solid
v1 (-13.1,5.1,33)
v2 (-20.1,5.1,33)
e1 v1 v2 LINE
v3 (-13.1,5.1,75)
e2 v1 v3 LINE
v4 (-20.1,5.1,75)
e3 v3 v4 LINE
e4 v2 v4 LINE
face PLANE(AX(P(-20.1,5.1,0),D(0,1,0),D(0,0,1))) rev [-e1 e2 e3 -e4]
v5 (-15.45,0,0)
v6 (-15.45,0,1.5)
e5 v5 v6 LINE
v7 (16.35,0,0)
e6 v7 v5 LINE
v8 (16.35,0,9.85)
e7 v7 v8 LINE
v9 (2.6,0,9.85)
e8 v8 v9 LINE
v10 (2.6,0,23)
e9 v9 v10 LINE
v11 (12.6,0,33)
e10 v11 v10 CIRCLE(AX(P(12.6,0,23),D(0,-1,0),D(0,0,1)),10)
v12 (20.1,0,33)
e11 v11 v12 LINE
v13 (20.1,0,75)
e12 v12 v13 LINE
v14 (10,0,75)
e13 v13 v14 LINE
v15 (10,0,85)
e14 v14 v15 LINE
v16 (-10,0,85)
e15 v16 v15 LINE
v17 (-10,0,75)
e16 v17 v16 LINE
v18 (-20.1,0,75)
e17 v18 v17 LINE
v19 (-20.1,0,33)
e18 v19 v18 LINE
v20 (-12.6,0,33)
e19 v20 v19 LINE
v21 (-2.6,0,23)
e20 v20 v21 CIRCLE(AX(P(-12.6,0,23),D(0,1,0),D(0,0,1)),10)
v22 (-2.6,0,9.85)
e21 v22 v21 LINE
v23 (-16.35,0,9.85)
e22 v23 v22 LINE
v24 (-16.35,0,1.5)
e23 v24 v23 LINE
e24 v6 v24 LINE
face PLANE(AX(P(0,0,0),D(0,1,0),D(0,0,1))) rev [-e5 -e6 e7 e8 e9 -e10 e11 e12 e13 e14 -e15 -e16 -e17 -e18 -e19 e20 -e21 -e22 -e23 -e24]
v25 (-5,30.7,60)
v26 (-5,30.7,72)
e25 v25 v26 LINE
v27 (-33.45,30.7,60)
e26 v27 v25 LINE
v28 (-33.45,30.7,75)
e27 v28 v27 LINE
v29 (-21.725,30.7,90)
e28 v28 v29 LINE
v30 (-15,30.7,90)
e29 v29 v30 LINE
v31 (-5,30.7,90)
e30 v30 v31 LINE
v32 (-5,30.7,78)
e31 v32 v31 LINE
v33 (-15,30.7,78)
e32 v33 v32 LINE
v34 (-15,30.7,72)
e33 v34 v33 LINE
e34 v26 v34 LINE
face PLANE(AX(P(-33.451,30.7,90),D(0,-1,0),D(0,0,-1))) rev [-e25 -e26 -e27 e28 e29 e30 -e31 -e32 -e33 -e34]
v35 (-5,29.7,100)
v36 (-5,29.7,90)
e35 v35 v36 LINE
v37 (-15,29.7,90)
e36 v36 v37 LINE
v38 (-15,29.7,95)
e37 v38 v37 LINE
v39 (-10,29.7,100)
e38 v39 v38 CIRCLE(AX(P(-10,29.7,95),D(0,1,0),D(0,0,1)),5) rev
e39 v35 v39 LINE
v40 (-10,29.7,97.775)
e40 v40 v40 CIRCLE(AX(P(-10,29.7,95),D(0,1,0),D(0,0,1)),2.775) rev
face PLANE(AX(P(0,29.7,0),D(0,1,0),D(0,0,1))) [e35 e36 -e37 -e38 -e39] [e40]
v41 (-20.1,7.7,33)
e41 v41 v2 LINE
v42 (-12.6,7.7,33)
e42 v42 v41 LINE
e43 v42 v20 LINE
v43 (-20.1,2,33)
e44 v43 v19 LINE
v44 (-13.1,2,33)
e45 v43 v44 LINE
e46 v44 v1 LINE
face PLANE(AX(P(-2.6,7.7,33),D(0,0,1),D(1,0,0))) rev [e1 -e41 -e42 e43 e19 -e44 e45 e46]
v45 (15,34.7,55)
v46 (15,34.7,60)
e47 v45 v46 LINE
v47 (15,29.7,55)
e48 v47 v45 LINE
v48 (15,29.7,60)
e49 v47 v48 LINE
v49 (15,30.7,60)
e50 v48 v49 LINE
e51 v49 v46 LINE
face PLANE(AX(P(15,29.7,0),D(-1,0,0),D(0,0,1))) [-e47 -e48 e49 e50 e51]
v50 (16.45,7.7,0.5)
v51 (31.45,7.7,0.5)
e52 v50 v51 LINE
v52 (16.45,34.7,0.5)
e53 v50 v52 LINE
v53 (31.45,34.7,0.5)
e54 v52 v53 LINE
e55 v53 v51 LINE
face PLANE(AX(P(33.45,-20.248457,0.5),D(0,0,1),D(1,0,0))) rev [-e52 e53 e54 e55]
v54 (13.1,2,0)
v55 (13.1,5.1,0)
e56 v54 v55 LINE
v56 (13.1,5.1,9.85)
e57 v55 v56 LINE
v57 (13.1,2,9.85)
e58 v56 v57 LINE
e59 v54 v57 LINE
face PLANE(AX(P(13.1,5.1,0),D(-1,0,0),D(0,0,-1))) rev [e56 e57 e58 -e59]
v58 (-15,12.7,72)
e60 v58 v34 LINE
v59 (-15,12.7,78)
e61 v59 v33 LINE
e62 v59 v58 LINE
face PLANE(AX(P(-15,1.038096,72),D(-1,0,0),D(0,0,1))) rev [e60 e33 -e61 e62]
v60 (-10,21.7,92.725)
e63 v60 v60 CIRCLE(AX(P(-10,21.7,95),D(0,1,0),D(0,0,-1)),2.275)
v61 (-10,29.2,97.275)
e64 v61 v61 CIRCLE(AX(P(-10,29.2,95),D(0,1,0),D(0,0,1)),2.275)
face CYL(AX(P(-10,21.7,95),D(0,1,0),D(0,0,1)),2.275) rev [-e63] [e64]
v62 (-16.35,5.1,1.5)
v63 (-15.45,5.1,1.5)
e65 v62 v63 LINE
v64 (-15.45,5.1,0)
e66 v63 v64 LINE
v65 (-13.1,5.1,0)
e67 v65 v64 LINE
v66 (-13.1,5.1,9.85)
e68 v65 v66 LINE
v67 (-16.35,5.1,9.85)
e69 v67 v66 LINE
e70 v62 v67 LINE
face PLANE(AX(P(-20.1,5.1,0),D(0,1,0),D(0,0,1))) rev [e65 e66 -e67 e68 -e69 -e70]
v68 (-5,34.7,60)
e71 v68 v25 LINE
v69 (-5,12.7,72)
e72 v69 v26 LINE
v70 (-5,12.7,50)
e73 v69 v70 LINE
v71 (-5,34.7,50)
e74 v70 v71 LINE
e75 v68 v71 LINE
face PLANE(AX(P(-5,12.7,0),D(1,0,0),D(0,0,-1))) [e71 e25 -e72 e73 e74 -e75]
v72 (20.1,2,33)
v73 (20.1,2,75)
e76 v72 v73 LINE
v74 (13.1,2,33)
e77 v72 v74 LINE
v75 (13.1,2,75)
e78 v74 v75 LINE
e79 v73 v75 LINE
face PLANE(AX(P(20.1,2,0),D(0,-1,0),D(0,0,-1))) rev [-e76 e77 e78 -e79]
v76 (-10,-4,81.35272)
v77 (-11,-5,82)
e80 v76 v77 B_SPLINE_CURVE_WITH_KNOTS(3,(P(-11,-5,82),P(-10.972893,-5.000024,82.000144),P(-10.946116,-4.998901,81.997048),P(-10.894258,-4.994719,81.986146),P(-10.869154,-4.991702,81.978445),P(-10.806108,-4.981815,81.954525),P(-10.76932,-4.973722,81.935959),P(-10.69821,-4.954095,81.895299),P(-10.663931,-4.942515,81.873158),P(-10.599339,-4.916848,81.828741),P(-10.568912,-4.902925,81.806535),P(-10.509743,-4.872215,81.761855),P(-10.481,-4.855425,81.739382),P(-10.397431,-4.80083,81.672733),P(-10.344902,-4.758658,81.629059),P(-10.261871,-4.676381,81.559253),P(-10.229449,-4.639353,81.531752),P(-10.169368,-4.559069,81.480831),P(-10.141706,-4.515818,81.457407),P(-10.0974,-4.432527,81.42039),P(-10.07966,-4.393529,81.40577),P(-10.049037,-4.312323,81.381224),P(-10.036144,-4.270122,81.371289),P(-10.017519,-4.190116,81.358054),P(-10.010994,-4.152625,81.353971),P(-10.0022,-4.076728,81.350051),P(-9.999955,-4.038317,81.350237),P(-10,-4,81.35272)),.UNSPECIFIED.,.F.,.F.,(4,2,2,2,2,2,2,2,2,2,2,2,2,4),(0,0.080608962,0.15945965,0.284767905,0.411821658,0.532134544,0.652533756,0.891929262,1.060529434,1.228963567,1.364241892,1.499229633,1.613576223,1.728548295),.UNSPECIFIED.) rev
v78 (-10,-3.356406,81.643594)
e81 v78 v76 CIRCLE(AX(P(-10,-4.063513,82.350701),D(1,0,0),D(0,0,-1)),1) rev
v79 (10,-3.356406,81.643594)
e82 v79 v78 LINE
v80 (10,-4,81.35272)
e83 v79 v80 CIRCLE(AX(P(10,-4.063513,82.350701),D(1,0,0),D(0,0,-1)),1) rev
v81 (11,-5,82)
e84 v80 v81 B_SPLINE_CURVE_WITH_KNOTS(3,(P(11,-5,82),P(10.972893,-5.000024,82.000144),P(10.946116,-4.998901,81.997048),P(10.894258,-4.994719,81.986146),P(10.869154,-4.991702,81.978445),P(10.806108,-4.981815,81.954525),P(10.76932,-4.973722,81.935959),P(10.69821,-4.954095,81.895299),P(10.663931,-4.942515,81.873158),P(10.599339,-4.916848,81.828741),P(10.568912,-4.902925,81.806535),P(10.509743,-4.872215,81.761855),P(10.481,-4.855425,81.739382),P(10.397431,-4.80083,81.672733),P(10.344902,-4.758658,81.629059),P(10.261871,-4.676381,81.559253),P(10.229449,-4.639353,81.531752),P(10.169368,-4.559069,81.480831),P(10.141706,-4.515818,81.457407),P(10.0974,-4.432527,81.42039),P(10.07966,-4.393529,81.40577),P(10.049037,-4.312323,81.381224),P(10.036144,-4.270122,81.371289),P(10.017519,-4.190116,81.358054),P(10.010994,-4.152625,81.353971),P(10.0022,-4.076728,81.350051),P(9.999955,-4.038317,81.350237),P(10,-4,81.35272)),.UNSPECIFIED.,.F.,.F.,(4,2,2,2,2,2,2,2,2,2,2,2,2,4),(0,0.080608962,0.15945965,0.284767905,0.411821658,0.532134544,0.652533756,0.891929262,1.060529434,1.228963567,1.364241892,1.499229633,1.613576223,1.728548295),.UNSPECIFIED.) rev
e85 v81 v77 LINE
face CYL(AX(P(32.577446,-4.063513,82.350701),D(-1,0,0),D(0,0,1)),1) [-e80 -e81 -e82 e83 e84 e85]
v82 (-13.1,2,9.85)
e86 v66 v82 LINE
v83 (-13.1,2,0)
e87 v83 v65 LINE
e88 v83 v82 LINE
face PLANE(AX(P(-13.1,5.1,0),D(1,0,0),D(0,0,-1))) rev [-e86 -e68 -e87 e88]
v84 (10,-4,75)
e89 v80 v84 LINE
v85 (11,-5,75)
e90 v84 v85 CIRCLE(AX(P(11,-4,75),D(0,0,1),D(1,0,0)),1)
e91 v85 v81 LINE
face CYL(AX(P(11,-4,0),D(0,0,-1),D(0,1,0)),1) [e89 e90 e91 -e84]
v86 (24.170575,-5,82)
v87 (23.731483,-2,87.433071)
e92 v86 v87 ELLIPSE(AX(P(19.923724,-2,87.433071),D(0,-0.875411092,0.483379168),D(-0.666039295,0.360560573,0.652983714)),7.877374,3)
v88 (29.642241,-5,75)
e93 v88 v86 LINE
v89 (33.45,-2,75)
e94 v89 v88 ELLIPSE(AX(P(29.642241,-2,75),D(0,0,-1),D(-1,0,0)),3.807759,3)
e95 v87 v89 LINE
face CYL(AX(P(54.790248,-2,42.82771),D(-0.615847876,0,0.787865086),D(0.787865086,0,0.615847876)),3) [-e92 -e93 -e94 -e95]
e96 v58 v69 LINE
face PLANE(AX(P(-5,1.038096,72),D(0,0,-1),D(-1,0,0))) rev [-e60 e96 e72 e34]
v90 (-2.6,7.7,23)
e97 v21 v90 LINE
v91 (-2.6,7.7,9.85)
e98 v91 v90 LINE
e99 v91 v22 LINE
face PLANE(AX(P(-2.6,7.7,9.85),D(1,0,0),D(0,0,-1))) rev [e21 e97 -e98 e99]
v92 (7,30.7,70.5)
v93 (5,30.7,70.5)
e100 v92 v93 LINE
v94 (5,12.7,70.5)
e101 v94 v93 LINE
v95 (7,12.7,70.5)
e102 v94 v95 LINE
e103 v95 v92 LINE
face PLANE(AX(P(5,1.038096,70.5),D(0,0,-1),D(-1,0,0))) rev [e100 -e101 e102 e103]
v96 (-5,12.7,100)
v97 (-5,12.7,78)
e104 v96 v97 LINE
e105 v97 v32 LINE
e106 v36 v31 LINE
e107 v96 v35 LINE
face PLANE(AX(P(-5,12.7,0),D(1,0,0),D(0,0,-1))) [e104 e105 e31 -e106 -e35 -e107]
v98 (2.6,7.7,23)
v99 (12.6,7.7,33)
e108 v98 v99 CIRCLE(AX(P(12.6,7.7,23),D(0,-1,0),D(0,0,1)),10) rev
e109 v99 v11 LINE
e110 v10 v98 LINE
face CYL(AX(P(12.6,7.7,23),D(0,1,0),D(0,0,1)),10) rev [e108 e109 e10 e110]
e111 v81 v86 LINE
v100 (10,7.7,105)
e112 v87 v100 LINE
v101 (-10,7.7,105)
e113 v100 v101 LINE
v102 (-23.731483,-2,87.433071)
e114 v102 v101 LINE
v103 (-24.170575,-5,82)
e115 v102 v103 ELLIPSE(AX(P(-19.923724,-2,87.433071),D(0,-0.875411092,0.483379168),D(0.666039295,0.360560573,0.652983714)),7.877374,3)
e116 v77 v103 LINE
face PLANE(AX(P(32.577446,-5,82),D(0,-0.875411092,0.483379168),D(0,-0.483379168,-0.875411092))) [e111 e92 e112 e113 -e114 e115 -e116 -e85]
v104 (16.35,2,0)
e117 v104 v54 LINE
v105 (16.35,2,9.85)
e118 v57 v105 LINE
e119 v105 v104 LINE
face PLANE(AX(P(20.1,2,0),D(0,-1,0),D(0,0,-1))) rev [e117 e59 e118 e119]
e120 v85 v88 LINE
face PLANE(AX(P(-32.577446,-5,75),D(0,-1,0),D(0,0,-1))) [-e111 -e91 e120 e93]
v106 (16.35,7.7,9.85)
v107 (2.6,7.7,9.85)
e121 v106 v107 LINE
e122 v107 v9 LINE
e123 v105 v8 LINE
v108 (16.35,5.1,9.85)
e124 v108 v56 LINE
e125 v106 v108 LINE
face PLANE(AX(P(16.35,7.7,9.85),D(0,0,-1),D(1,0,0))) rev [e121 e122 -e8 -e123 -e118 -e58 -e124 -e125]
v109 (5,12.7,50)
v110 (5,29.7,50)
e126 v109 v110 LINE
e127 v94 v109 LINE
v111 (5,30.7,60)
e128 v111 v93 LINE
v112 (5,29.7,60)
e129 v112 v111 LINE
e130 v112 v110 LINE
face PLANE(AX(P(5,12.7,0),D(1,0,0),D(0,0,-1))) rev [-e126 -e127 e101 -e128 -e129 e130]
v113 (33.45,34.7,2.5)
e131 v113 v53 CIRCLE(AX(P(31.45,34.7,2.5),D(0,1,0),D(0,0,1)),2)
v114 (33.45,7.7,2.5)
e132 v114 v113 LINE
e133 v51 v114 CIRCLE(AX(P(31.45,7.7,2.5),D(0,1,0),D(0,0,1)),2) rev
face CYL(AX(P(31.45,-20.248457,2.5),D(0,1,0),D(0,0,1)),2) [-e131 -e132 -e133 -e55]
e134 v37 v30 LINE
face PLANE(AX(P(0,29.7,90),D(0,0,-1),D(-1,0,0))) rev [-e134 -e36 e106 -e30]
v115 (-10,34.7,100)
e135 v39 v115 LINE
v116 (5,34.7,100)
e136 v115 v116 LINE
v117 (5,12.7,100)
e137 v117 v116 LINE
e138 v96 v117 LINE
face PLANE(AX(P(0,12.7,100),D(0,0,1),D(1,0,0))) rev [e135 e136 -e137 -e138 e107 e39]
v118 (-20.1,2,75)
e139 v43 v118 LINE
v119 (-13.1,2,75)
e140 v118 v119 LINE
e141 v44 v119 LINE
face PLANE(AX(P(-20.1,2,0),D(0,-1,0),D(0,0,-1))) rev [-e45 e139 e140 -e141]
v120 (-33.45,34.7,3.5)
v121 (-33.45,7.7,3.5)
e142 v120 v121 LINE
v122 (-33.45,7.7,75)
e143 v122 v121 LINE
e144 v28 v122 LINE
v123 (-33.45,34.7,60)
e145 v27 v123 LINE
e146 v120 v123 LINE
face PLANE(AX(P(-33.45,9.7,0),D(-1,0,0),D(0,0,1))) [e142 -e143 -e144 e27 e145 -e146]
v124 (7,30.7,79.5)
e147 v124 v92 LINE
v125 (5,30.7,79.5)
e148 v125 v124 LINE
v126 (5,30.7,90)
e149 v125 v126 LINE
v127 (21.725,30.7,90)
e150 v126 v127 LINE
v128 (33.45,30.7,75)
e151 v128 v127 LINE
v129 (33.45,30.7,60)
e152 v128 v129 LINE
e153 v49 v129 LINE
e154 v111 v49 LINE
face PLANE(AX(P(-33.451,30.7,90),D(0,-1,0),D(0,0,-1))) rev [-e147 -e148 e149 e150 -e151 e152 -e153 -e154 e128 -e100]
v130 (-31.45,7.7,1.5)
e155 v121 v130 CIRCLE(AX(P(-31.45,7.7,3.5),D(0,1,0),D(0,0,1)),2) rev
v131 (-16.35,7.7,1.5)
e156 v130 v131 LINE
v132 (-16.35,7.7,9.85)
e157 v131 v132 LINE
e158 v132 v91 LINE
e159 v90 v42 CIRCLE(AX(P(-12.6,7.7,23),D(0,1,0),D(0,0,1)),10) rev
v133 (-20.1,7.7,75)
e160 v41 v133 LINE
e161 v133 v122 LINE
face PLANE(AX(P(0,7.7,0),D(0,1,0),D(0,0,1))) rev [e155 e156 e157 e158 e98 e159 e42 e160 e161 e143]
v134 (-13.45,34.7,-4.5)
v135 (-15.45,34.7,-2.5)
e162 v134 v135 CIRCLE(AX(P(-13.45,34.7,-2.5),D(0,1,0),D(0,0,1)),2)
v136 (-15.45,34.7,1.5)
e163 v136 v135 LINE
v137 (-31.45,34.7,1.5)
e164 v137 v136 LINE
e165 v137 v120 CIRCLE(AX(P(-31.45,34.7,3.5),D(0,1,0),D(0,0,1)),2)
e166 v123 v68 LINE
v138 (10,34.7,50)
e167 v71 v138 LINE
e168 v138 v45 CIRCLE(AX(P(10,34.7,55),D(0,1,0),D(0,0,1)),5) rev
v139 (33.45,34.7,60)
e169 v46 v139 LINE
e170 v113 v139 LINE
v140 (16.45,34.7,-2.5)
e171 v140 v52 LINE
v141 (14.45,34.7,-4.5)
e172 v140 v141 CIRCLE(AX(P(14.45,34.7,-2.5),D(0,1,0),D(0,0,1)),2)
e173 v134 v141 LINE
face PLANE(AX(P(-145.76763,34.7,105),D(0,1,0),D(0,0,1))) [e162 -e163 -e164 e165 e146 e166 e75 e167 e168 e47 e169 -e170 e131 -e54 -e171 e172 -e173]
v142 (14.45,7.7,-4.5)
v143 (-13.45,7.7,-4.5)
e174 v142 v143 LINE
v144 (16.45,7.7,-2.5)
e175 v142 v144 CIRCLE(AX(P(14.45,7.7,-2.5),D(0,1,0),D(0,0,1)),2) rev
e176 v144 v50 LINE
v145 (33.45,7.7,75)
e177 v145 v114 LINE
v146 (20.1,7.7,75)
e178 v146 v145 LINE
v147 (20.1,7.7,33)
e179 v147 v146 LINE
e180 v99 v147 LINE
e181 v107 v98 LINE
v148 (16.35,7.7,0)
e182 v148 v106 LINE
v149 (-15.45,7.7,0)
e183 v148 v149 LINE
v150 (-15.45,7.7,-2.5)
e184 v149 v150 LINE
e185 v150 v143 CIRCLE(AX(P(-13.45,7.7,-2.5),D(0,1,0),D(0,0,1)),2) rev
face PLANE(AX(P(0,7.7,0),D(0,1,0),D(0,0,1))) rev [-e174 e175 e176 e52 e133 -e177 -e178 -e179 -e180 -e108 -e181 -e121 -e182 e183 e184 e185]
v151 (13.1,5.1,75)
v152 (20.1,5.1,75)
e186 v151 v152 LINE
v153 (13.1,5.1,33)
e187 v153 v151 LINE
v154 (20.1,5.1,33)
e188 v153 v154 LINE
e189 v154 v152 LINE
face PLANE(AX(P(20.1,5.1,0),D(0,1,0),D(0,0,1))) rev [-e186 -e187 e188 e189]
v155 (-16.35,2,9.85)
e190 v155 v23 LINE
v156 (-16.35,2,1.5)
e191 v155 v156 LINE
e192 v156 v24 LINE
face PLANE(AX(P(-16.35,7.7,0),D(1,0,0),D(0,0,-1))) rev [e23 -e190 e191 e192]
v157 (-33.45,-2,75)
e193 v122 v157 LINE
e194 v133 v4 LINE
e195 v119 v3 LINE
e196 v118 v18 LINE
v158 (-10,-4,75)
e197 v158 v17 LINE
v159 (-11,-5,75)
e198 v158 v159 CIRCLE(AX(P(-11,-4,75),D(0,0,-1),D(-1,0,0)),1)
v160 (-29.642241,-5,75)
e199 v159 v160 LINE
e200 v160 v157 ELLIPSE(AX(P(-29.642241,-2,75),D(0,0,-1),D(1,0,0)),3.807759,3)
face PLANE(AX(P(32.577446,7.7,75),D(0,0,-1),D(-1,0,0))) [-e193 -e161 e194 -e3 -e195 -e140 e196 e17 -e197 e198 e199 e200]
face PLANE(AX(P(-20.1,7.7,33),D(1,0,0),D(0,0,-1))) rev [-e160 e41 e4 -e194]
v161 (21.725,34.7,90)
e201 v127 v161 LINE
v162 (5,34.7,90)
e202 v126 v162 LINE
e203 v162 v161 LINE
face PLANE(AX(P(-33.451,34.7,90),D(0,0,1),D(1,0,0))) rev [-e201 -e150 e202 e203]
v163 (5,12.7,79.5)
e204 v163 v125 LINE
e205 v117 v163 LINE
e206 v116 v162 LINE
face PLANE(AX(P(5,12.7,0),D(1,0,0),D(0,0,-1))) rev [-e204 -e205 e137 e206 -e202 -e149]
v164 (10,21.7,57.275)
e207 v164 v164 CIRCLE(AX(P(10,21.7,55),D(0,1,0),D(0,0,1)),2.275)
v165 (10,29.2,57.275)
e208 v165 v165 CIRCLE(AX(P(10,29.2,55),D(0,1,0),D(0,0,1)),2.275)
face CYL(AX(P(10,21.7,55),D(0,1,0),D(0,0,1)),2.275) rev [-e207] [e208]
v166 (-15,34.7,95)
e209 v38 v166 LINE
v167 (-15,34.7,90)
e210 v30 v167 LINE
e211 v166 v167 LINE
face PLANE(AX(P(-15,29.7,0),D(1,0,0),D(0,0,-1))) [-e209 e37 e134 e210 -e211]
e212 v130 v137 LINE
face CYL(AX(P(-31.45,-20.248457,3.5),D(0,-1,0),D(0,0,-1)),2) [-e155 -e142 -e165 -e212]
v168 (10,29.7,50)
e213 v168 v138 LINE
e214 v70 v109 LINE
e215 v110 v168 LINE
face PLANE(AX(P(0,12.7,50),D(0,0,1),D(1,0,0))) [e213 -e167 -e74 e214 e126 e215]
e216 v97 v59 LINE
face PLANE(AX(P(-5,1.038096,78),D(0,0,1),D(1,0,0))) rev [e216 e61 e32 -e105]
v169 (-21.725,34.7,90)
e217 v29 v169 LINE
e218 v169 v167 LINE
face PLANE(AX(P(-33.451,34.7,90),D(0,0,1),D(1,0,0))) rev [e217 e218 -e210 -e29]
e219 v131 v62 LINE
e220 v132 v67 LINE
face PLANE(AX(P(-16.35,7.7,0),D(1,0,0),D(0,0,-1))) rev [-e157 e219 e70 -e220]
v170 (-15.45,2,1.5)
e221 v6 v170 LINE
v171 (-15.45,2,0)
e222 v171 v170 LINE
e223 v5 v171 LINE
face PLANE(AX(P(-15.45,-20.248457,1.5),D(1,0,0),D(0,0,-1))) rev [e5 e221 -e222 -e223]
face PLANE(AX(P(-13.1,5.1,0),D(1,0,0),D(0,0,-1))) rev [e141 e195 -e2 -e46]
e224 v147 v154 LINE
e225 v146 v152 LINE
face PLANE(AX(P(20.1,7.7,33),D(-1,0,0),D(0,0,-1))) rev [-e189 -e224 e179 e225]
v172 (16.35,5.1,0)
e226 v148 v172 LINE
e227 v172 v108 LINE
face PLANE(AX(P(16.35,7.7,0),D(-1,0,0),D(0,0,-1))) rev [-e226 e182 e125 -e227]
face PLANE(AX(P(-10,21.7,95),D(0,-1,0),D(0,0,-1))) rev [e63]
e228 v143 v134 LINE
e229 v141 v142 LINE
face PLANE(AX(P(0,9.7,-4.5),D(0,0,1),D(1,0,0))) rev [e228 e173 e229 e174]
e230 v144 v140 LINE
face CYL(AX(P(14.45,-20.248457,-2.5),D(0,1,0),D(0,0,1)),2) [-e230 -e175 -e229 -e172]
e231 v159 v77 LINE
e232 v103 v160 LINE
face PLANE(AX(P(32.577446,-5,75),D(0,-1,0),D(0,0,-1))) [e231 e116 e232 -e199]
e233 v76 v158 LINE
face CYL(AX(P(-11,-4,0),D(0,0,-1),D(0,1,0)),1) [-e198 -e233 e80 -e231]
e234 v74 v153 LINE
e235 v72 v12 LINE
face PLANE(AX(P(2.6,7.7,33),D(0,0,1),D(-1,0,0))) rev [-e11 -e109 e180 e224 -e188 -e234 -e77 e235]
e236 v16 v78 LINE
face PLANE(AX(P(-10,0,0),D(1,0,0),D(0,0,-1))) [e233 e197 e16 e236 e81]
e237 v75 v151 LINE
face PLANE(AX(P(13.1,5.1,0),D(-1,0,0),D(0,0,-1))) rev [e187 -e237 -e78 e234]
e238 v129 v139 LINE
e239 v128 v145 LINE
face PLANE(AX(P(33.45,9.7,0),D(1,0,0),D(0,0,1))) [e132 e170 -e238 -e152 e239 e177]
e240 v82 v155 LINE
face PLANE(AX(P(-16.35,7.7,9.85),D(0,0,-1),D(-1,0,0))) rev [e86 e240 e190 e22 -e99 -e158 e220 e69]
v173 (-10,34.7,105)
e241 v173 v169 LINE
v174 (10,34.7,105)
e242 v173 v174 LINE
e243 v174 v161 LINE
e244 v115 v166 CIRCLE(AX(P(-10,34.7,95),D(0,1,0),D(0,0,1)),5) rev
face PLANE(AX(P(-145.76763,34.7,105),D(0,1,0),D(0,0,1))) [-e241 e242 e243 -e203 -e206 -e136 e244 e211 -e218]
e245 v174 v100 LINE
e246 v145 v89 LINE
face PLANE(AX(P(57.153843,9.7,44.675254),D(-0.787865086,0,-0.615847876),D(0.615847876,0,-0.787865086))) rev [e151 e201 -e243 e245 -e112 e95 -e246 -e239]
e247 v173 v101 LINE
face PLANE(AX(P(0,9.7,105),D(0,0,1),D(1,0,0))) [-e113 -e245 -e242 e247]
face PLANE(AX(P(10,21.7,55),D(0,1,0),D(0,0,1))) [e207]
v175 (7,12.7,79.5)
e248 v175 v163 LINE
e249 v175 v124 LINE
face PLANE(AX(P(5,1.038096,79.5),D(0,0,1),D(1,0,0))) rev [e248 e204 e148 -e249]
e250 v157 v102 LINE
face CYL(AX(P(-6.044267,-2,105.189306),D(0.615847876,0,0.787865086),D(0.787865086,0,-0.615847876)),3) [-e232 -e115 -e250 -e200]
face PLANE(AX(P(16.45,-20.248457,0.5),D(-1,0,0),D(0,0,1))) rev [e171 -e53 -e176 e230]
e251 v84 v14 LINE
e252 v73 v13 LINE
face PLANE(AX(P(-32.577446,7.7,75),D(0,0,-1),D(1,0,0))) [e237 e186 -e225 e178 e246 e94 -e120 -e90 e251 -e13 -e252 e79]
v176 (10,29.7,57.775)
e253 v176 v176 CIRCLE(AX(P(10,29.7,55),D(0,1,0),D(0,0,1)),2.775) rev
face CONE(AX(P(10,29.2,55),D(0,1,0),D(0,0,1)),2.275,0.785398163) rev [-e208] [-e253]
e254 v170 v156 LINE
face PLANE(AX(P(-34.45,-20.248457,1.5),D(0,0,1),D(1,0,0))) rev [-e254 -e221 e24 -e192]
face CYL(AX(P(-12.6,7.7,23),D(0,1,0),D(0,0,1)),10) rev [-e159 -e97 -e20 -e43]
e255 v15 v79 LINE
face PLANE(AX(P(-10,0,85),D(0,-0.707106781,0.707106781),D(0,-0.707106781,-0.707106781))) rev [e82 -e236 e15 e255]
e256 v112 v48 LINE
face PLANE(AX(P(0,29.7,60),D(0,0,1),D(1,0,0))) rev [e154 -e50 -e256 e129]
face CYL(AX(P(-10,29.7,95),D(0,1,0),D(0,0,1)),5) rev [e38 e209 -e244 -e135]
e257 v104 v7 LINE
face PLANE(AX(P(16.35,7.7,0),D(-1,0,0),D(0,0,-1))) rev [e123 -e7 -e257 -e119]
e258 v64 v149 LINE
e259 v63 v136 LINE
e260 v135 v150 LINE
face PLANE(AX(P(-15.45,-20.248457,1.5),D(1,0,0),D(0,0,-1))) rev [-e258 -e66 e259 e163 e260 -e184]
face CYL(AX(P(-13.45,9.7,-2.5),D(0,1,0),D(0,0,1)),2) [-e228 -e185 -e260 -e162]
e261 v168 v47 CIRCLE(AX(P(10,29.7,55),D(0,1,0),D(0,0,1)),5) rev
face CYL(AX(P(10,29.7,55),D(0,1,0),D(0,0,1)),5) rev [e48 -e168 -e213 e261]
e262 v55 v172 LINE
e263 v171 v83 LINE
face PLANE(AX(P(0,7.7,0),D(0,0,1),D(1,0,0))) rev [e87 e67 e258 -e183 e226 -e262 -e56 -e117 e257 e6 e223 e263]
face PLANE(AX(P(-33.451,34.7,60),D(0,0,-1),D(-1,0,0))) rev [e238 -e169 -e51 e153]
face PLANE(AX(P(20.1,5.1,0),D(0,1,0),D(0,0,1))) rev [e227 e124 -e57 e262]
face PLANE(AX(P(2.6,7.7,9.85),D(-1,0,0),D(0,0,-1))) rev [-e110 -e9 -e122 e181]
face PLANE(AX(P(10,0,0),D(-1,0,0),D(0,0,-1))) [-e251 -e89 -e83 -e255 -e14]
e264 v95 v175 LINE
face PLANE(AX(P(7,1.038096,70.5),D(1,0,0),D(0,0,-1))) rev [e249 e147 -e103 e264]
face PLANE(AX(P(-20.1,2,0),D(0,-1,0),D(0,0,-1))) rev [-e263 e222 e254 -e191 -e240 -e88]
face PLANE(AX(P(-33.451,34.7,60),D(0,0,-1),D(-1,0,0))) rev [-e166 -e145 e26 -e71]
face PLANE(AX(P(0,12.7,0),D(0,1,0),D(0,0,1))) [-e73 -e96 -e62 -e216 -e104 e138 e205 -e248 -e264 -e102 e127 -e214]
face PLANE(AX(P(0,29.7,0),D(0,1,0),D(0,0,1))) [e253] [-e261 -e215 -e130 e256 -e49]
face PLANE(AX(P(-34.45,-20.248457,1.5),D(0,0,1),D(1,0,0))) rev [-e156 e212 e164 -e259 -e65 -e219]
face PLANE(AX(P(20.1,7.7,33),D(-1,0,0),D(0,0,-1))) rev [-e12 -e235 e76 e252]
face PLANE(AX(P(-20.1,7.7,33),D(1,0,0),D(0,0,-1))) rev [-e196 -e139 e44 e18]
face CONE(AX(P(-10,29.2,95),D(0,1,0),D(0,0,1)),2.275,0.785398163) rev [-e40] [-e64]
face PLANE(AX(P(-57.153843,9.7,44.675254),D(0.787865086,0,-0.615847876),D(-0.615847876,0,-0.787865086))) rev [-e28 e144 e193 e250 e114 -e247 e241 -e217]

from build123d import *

# Parameters (mm, degrees)
BOSS_EXTRUDE1_DEPTH     = 7.7
SKETCH2_W               = 7
SKETCH2_H               = 3.1
CUT_EXTRUDE1_DEPTH      = 79.027559234
FILLET1_R               = 10
BOSS_EXTRUDE2_DEPTH     = 2
SKETCH4_W               = 109.5
SKETCH4_H               = 25
BOSS_EXTRUDE3_DEPTH     = 33.45
BOSS_EXTRUDE4_REACH     = 117.534
CUT_EXTRUDE2_DEPTH      = 114.458814113
CUT_EXTRUDE2_DEPTH_BACK = 114.458814113
CUT_EXTRUDE3_DEPTH      = 10
FILLET3_R               = 1
CUT_EXTRUDE5_REACH      = 117.534
SKETCH9_W               = 30
SKETCH9_H               = 4
FILLET5_R               = 3
CUT_EXTRUDE4_REACH      = 119.132
SKETCH8_W               = 17
SKETCH8_H               = 5
SKETCH8_W_2             = 19
SKETCH8_H_2             = 7
FILLET6_R               = 2
FILLET7_R               = 2
SKETCH11_W              = 10
SKETCH11_H              = 10
CUT_EXTRUDE6_DEPTH      = 22
CUT_EXTRUDE9_DEPTH      = 5
SKETCH12_R              = 2.275
CUT_EXTRUDE7_DEPTH      = 8
CHAMFER1_SIZE           = 0.5
SKETCH13_W              = 2
SKETCH13_H              = 9
SKETCH13_W_2            = 10
SKETCH13_H_2            = 6
CUT_EXTRUDE10_DEPTH     = 18


with BuildPart() as part:
    # Sketch1 → Boss-Extrude1 (new body)
    with BuildSketch(Plane(origin=(0, 0, 0), x_dir=(1, 0, 0), z_dir=(0, 1, 0))):
        Polygon((0, 0), (-16.35, 0), (-16.35, -9.85), (-2.6, -9.85), (-2.6, -33), (-20.1, -33), (-20.1, -75), (0, -75), align=None)
    extrude(amount=BOSS_EXTRUDE1_DEPTH)

    # Sketch2 → Cut-Extrude1 (cut, through all)
    with BuildSketch(Plane.XY.offset(75)):
        with Locations((-16.6, 3.55)):
            Rectangle(SKETCH2_W, SKETCH2_H)
    extrude(amount=-CUT_EXTRUDE1_DEPTH, mode=Mode.SUBTRACT)

    # Fillet1
    fillet1_edges = [part.edges().sort_by_distance(p)[0] for p in [
        (-2.6, 3.85, 33),
    ]]
    fillet(fillet1_edges, radius=FILLET1_R)

    # Sketch3 → Boss-Extrude2 (add)
    with BuildSketch(Plane(origin=(0, 7.7, 0), x_dir=(1, 0, 0), z_dir=(0, 1, 0))):
        Polygon((0, 4.5), (-33.45, 4.5), (-33.45, -75), (-10, -105), (0, -105), align=None)
    extrude(amount=BOSS_EXTRUDE2_DEPTH)

    # Sketch4 → Boss-Extrude3 (add)
    with BuildSketch(Plane(origin=(0, 0, 0), x_dir=(0, 0, -1), z_dir=(1, 0, 0))):
        with Locations((-50.25, 22.2)):
            Rectangle(SKETCH4_W, SKETCH4_H)
    extrude(amount=-BOSS_EXTRUDE3_DEPTH)

    # Boss-Extrude4: up to this face of the body (flat: up to its plane)
    boss_extrude4_end = Plane(part.part.faces().sort_by_distance((0, 18.36479202, 48.166489813))[0])
    # Sketch5 → Boss-Extrude4 (add, up to the picked face)
    with BuildSketch(Plane.ZY.offset(33.45), mode=Mode.PRIVATE) as boss_extrude4_sk1:
        Polygon((75, 7.7), (75, -5), (82, -5), (105, 7.7), align=None)
    boss_extrude4_tool1 = split(extrude(boss_extrude4_sk1.sketch, amount=-BOSS_EXTRUDE4_REACH, mode=Mode.PRIVATE), bisect_by=boss_extrude4_end, keep=Keep.BOTH, mode=Mode.PRIVATE)
    add(boss_extrude4_tool1.solids().sort_by(Axis((-33.45, 2.665766, 85.441441), (1, 0, 0)))[0])

    # Sketch6 → Cut-Extrude2 (cut, two sides: drawn at the far end of the back side and taken through both)
    with BuildSketch(Plane(origin=(0, 7.7, 0), x_dir=(1, 0, 0), z_dir=(0, 1, 0)).offset(-CUT_EXTRUDE2_DEPTH_BACK)):
        Polygon((-33.45, -75), (-10, -105), (-33.45, -105), align=None)
    extrude(amount=CUT_EXTRUDE2_DEPTH + CUT_EXTRUDE2_DEPTH_BACK, mode=Mode.SUBTRACT)

    # Sketch7 → Cut-Extrude3 (cut)
    with BuildSketch(Plane(origin=(0, 0, 0), x_dir=(0, 0, -1), z_dir=(1, 0, 0))):
        Polygon((-75, 0), (-85, 0), (-80, -5), (-75, -5), align=None)
    extrude(amount=-CUT_EXTRUDE3_DEPTH, mode=Mode.SUBTRACT)

    # Fillet3
    # the kernel refuses this fillet: 1 mm, written as the material it takes off along each edge
    with BuildSketch(Plane(origin=(5.810983209, -5, 80), x_dir=(0, 0.707106781186549, 0.7071067811865459), z_dir=(-1, 0, 0))) as fillet3_piece_1:
        with BuildLine():
            CenterArc((2.324393283, -1), FILLET3_R, 90, 114.469800521)
            Line((1.414213562, -1.414213562), (1.396009968, -1.422497834))
            ThreePointArc((1.396009968, -1.422497834), (0.692964646, -0.721248917), (-0.014142136, -0.014142136))
            Line((-0.014142136, -0.014142136), (0, 0.02))
            Line((0, 0.02), (2.324393283, 0.02))
            Line((2.324393283, 0.02), (2.324393283, 0))
        make_face()
    extrude(amount=15.810983209, mode=Mode.SUBTRACT)
    with BuildSketch(Plane(origin=(-10, -5, 82.5), x_dir=(0, 1, 0), z_dir=(0, 0, -1))) as fillet3_piece_2_section:
        with BuildLine():
            CenterArc((FILLET3_R, -FILLET3_R), FILLET3_R, 90, 90)
            Line((0, -FILLET3_R), (-FILLET3_R * 0.02, -FILLET3_R))
            Line((-FILLET3_R * 0.02, -FILLET3_R), (-FILLET3_R * 0.02, FILLET3_R * 0.02))
            Line((-FILLET3_R * 0.02, FILLET3_R * 0.02), (FILLET3_R, FILLET3_R * 0.02))
            Line((FILLET3_R, FILLET3_R * 0.02), (FILLET3_R, 0))
        make_face()
    fillet3_piece_2 = extrude(amount=10, mode=Mode.PRIVATE)
    fillet3_piece_2 = split(fillet3_piece_2, bisect_by=Plane(origin=(-10.222841489, -6.700692184, 78.299307816), z_dir=(0, 0.7071067811865466, -0.7071067811865485)), keep=Keep.TOP, mode=Mode.PRIVATE)
    add(fillet3_piece_2, mode=Mode.SUBTRACT)
    with BuildSketch(Plane(origin=(5.810983209, -5, 80), x_dir=(0, 0.707106781186549, 0.7071067811865459), z_dir=(-1, 0, 0))) as fillet3_piece_3a_section:
        with BuildLine():
            CenterArc((2.324393283, -1), FILLET3_R, 90, 114.469800521)
            Line((1.414213562, -1.414213562), (1.396009968, -1.422497834))
            ThreePointArc((1.396009968, -1.422497834), (0.692964646, -0.721248917), (-0.014142136, -0.014142136))
            Line((-0.014142136, -0.014142136), (0, 0.02))
            Line((0, 0.02), (2.324393283, 0.02))
            Line((2.324393283, 0.02), (2.324393283, 0))
        make_face()
    fillet3_piece_3a = extrude(amount=21.621966417, mode=Mode.PRIVATE)
    fillet3_piece_3a = split(fillet3_piece_3a, bisect_by=Plane(origin=(-10, -4.567151235, 80.996776665), z_dir=(-1, 0, 0)), keep=Keep.TOP, mode=Mode.PRIVATE)
    with BuildSketch(Plane(origin=(-10, -5, 82.5), x_dir=(0, 1, 0), z_dir=(0, 0, -1))) as fillet3_piece_3b_section:
        with BuildLine():
            CenterArc((FILLET3_R, -FILLET3_R), FILLET3_R, 90, 90)
            Line((0, -FILLET3_R), (-FILLET3_R * 0.02, -FILLET3_R))
            Line((-FILLET3_R * 0.02, -FILLET3_R), (-FILLET3_R * 0.02, FILLET3_R * 0.02))
            Line((-FILLET3_R * 0.02, FILLET3_R * 0.02), (FILLET3_R, FILLET3_R * 0.02))
            Line((FILLET3_R, FILLET3_R * 0.02), (FILLET3_R, 0))
        make_face()
    fillet3_piece_3b = extrude(amount=10, mode=Mode.PRIVATE)
    fillet3_piece_3b = split(fillet3_piece_3b, bisect_by=Plane(origin=(-10.238471404, -4.220535034, 80.779464966), z_dir=(0, -0.7071067811865466, 0.7071067811865485)), keep=Keep.TOP, mode=Mode.PRIVATE)
    fillet3_piece_3 = fillet3_piece_3a & fillet3_piece_3b
    add(fillet3_piece_3, mode=Mode.SUBTRACT)

    # Sketch9 → Cut-Extrude5 (cut, up to next)
    with BuildSketch(Plane(origin=(0, 0, 0), x_dir=(0, 0, -1), z_dir=(1, 0, 0)), mode=Mode.PRIVATE) as cut_extrude5_sk1:
        with Locations((-75, 32.7)):
            Rectangle(SKETCH9_W, SKETCH9_H)
    cut_extrude5_tool1 = extrude(cut_extrude5_sk1.sketch, amount=-CUT_EXTRUDE5_REACH, mode=Mode.PRIVATE) & part.part
    add(cut_extrude5_tool1.solids().sort_by_distance((0, 32.7, 75))[0], mode=Mode.SUBTRACT)

    # Mirror1: part across plane


with BuildPart() as part_1:
    add(part.part)
    add(part.part.mirror(Plane(origin=(0, 7.7, 75), x_dir=(0, 0, 1), z_dir=(-1, 0, 0))))

    # Fillet5
    # the kernel refuses this fillet: 3 mm, written as the material it takes off along each edge
    with BuildSketch(Plane(origin=(-38.068859068, -5, 69.091011854), x_dir=(0, 1, 0), z_dir=(0.6158478756904763, 0, 0.7878650861711843)), Plane(origin=(38.068859068, -5, 69.091011854), x_dir=(-0.7878650861711843, 0, -0.6158478756904764), z_dir=(-0.6158478756904763, 0, 0.7878650861711843))) as fillet5_piece_1:
        with BuildLine():
            CenterArc((FILLET5_R, -FILLET5_R), FILLET5_R, 90, 90)
            Line((0, -FILLET5_R), (0, 0))
            Line((0, 0), (FILLET5_R, 0))
        make_face()
    extrude(amount=23.884769896, mode=Mode.SUBTRACT)

    # Cut-Extrude4: up to this face of the body (flat: up to its plane)
    cut_extrude4_end = Plane(part_1.part.faces().sort_by_distance((0, 0, 47.459676899))[0])
    # Sketch8 → Cut-Extrude4 (cut, up to the picked face)
    with BuildSketch(Plane(origin=(0, 34.7, 0), x_dir=(1, 0, 0), z_dir=(0, 1, 0)), mode=Mode.PRIVATE) as cut_extrude4_sk1:
        with Locations((24.95, 2)):
            Rectangle(SKETCH8_W, SKETCH8_H)
    cut_extrude4_tool1 = split(extrude(cut_extrude4_sk1.sketch, amount=-CUT_EXTRUDE4_REACH, mode=Mode.PRIVATE), bisect_by=cut_extrude4_end, keep=Keep.BOTH, mode=Mode.PRIVATE)
    # Sketch8 → Cut-Extrude4 (cut, up to the picked face)
    with BuildSketch(Plane(origin=(0, 34.7, 0), x_dir=(1, 0, 0), z_dir=(0, 1, 0)), mode=Mode.PRIVATE) as cut_extrude4_sk2:
        with Locations((-24.95, 2)):
            Rectangle(SKETCH8_W_2, SKETCH8_H_2)
    cut_extrude4_tool2 = split(extrude(cut_extrude4_sk2.sketch, amount=-CUT_EXTRUDE4_REACH, mode=Mode.PRIVATE), bisect_by=cut_extrude4_end, keep=Keep.BOTH, mode=Mode.PRIVATE)
    add(cut_extrude4_tool1.solids().sort_by(Axis((24.95, 34.7, -2), (0, -1, 0)))[0], mode=Mode.SUBTRACT)
    add(cut_extrude4_tool2.solids().sort_by(Axis((-24.95, 34.7, -2), (0, -1, 0)))[0], mode=Mode.SUBTRACT)

    # Fillet6
    fillet6_edges = [part_1.edges().sort_by_distance(p)[0] for p in [
        (-15.45, 21.2, -4.5),
        (-33.45, 21.2, 1.5),
    ]]
    fillet(fillet6_edges, radius=FILLET6_R)

    # Fillet7
    fillet7_edges = [part_1.edges().sort_by_distance(p)[0] for p in [
        (33.45, 21.2, 0.5),
        (16.45, 21.2, -4.5),
    ]]
    fillet(fillet7_edges, radius=FILLET7_R)

    # Sketch11 → Cut-Extrude6 (cut)
    with BuildSketch(Plane(origin=(0, 34.7, 0), x_dir=(1, 0, 0), z_dir=(0, 1, 0))):
        Polygon((-5, -90), (-5, -100), (5, -100), (5, -60), (-5, -60), align=None)
        with Locations((0, -55)):
            Rectangle(SKETCH11_W, SKETCH11_H)
    extrude(amount=-CUT_EXTRUDE6_DEPTH, mode=Mode.SUBTRACT)

    # Sketch11<3> → Cut-Extrude9 (cut)
    with BuildSketch(Plane(origin=(0, 34.7, 0), x_dir=(1, 0, 0), z_dir=(0, 1, 0))):
        Polygon((-5, -90), (-5, -100), (5, -100), (5, -60), (5, -50), (-5, -50), align=None)
        with BuildLine():
            Line((-10, -100), (-5, -100))
            Line((-5, -100), (-5, -90))
            Line((-5, -90), (-15, -90))
            Line((-15, -90), (-15, -95))
            ThreePointArc((-15, -95), (-13.535533906, -98.535533906), (-10, -100))
        make_face()
        with BuildLine():
            Line((5, -50), (5, -60))
            Line((5, -60), (15, -60))
            Line((15, -60), (15, -55))
            ThreePointArc((15, -55), (13.535533906, -51.464466094), (10, -50))
            Line((10, -50), (5, -50))
        make_face()
    extrude(amount=-CUT_EXTRUDE9_DEPTH, mode=Mode.SUBTRACT)

    # Sketch12 → Cut-Extrude7 (cut)
    with BuildSketch(Plane(origin=(0, 29.7, 0), x_dir=(1, 0, 0), z_dir=(0, 1, 0))):
        with Locations(Location((10, -55, 0), (0, 0, 270))):
            Circle(SKETCH12_R)
        with Locations(Location((-10, -95, 0), (0, 0, 90))):
            Circle(SKETCH12_R)
    extrude(amount=-CUT_EXTRUDE7_DEPTH, mode=Mode.SUBTRACT)

    # Chamfer1
    chamfer1_edges = [part_1.edges().sort_by_distance(p)[0] for p in [
        (10, 29.7, 52.725),
        (-10, 29.7, 97.275),
    ]]
    chamfer(chamfer1_edges, length=CHAMFER1_SIZE)

    # Sketch13 → Cut-Extrude10 (cut)
    with BuildSketch(Plane(origin=(0, 30.7, 0), x_dir=(1, 0, 0), z_dir=(0, 1, 0))):
        with Locations((6, -75)):
            Rectangle(SKETCH13_W, SKETCH13_H)
        with Locations((-10, -75)):
            Rectangle(SKETCH13_W_2, SKETCH13_H_2)
    extrude(amount=-CUT_EXTRUDE10_DEPTH, mode=Mode.SUBTRACT)


solid = part_1.part
